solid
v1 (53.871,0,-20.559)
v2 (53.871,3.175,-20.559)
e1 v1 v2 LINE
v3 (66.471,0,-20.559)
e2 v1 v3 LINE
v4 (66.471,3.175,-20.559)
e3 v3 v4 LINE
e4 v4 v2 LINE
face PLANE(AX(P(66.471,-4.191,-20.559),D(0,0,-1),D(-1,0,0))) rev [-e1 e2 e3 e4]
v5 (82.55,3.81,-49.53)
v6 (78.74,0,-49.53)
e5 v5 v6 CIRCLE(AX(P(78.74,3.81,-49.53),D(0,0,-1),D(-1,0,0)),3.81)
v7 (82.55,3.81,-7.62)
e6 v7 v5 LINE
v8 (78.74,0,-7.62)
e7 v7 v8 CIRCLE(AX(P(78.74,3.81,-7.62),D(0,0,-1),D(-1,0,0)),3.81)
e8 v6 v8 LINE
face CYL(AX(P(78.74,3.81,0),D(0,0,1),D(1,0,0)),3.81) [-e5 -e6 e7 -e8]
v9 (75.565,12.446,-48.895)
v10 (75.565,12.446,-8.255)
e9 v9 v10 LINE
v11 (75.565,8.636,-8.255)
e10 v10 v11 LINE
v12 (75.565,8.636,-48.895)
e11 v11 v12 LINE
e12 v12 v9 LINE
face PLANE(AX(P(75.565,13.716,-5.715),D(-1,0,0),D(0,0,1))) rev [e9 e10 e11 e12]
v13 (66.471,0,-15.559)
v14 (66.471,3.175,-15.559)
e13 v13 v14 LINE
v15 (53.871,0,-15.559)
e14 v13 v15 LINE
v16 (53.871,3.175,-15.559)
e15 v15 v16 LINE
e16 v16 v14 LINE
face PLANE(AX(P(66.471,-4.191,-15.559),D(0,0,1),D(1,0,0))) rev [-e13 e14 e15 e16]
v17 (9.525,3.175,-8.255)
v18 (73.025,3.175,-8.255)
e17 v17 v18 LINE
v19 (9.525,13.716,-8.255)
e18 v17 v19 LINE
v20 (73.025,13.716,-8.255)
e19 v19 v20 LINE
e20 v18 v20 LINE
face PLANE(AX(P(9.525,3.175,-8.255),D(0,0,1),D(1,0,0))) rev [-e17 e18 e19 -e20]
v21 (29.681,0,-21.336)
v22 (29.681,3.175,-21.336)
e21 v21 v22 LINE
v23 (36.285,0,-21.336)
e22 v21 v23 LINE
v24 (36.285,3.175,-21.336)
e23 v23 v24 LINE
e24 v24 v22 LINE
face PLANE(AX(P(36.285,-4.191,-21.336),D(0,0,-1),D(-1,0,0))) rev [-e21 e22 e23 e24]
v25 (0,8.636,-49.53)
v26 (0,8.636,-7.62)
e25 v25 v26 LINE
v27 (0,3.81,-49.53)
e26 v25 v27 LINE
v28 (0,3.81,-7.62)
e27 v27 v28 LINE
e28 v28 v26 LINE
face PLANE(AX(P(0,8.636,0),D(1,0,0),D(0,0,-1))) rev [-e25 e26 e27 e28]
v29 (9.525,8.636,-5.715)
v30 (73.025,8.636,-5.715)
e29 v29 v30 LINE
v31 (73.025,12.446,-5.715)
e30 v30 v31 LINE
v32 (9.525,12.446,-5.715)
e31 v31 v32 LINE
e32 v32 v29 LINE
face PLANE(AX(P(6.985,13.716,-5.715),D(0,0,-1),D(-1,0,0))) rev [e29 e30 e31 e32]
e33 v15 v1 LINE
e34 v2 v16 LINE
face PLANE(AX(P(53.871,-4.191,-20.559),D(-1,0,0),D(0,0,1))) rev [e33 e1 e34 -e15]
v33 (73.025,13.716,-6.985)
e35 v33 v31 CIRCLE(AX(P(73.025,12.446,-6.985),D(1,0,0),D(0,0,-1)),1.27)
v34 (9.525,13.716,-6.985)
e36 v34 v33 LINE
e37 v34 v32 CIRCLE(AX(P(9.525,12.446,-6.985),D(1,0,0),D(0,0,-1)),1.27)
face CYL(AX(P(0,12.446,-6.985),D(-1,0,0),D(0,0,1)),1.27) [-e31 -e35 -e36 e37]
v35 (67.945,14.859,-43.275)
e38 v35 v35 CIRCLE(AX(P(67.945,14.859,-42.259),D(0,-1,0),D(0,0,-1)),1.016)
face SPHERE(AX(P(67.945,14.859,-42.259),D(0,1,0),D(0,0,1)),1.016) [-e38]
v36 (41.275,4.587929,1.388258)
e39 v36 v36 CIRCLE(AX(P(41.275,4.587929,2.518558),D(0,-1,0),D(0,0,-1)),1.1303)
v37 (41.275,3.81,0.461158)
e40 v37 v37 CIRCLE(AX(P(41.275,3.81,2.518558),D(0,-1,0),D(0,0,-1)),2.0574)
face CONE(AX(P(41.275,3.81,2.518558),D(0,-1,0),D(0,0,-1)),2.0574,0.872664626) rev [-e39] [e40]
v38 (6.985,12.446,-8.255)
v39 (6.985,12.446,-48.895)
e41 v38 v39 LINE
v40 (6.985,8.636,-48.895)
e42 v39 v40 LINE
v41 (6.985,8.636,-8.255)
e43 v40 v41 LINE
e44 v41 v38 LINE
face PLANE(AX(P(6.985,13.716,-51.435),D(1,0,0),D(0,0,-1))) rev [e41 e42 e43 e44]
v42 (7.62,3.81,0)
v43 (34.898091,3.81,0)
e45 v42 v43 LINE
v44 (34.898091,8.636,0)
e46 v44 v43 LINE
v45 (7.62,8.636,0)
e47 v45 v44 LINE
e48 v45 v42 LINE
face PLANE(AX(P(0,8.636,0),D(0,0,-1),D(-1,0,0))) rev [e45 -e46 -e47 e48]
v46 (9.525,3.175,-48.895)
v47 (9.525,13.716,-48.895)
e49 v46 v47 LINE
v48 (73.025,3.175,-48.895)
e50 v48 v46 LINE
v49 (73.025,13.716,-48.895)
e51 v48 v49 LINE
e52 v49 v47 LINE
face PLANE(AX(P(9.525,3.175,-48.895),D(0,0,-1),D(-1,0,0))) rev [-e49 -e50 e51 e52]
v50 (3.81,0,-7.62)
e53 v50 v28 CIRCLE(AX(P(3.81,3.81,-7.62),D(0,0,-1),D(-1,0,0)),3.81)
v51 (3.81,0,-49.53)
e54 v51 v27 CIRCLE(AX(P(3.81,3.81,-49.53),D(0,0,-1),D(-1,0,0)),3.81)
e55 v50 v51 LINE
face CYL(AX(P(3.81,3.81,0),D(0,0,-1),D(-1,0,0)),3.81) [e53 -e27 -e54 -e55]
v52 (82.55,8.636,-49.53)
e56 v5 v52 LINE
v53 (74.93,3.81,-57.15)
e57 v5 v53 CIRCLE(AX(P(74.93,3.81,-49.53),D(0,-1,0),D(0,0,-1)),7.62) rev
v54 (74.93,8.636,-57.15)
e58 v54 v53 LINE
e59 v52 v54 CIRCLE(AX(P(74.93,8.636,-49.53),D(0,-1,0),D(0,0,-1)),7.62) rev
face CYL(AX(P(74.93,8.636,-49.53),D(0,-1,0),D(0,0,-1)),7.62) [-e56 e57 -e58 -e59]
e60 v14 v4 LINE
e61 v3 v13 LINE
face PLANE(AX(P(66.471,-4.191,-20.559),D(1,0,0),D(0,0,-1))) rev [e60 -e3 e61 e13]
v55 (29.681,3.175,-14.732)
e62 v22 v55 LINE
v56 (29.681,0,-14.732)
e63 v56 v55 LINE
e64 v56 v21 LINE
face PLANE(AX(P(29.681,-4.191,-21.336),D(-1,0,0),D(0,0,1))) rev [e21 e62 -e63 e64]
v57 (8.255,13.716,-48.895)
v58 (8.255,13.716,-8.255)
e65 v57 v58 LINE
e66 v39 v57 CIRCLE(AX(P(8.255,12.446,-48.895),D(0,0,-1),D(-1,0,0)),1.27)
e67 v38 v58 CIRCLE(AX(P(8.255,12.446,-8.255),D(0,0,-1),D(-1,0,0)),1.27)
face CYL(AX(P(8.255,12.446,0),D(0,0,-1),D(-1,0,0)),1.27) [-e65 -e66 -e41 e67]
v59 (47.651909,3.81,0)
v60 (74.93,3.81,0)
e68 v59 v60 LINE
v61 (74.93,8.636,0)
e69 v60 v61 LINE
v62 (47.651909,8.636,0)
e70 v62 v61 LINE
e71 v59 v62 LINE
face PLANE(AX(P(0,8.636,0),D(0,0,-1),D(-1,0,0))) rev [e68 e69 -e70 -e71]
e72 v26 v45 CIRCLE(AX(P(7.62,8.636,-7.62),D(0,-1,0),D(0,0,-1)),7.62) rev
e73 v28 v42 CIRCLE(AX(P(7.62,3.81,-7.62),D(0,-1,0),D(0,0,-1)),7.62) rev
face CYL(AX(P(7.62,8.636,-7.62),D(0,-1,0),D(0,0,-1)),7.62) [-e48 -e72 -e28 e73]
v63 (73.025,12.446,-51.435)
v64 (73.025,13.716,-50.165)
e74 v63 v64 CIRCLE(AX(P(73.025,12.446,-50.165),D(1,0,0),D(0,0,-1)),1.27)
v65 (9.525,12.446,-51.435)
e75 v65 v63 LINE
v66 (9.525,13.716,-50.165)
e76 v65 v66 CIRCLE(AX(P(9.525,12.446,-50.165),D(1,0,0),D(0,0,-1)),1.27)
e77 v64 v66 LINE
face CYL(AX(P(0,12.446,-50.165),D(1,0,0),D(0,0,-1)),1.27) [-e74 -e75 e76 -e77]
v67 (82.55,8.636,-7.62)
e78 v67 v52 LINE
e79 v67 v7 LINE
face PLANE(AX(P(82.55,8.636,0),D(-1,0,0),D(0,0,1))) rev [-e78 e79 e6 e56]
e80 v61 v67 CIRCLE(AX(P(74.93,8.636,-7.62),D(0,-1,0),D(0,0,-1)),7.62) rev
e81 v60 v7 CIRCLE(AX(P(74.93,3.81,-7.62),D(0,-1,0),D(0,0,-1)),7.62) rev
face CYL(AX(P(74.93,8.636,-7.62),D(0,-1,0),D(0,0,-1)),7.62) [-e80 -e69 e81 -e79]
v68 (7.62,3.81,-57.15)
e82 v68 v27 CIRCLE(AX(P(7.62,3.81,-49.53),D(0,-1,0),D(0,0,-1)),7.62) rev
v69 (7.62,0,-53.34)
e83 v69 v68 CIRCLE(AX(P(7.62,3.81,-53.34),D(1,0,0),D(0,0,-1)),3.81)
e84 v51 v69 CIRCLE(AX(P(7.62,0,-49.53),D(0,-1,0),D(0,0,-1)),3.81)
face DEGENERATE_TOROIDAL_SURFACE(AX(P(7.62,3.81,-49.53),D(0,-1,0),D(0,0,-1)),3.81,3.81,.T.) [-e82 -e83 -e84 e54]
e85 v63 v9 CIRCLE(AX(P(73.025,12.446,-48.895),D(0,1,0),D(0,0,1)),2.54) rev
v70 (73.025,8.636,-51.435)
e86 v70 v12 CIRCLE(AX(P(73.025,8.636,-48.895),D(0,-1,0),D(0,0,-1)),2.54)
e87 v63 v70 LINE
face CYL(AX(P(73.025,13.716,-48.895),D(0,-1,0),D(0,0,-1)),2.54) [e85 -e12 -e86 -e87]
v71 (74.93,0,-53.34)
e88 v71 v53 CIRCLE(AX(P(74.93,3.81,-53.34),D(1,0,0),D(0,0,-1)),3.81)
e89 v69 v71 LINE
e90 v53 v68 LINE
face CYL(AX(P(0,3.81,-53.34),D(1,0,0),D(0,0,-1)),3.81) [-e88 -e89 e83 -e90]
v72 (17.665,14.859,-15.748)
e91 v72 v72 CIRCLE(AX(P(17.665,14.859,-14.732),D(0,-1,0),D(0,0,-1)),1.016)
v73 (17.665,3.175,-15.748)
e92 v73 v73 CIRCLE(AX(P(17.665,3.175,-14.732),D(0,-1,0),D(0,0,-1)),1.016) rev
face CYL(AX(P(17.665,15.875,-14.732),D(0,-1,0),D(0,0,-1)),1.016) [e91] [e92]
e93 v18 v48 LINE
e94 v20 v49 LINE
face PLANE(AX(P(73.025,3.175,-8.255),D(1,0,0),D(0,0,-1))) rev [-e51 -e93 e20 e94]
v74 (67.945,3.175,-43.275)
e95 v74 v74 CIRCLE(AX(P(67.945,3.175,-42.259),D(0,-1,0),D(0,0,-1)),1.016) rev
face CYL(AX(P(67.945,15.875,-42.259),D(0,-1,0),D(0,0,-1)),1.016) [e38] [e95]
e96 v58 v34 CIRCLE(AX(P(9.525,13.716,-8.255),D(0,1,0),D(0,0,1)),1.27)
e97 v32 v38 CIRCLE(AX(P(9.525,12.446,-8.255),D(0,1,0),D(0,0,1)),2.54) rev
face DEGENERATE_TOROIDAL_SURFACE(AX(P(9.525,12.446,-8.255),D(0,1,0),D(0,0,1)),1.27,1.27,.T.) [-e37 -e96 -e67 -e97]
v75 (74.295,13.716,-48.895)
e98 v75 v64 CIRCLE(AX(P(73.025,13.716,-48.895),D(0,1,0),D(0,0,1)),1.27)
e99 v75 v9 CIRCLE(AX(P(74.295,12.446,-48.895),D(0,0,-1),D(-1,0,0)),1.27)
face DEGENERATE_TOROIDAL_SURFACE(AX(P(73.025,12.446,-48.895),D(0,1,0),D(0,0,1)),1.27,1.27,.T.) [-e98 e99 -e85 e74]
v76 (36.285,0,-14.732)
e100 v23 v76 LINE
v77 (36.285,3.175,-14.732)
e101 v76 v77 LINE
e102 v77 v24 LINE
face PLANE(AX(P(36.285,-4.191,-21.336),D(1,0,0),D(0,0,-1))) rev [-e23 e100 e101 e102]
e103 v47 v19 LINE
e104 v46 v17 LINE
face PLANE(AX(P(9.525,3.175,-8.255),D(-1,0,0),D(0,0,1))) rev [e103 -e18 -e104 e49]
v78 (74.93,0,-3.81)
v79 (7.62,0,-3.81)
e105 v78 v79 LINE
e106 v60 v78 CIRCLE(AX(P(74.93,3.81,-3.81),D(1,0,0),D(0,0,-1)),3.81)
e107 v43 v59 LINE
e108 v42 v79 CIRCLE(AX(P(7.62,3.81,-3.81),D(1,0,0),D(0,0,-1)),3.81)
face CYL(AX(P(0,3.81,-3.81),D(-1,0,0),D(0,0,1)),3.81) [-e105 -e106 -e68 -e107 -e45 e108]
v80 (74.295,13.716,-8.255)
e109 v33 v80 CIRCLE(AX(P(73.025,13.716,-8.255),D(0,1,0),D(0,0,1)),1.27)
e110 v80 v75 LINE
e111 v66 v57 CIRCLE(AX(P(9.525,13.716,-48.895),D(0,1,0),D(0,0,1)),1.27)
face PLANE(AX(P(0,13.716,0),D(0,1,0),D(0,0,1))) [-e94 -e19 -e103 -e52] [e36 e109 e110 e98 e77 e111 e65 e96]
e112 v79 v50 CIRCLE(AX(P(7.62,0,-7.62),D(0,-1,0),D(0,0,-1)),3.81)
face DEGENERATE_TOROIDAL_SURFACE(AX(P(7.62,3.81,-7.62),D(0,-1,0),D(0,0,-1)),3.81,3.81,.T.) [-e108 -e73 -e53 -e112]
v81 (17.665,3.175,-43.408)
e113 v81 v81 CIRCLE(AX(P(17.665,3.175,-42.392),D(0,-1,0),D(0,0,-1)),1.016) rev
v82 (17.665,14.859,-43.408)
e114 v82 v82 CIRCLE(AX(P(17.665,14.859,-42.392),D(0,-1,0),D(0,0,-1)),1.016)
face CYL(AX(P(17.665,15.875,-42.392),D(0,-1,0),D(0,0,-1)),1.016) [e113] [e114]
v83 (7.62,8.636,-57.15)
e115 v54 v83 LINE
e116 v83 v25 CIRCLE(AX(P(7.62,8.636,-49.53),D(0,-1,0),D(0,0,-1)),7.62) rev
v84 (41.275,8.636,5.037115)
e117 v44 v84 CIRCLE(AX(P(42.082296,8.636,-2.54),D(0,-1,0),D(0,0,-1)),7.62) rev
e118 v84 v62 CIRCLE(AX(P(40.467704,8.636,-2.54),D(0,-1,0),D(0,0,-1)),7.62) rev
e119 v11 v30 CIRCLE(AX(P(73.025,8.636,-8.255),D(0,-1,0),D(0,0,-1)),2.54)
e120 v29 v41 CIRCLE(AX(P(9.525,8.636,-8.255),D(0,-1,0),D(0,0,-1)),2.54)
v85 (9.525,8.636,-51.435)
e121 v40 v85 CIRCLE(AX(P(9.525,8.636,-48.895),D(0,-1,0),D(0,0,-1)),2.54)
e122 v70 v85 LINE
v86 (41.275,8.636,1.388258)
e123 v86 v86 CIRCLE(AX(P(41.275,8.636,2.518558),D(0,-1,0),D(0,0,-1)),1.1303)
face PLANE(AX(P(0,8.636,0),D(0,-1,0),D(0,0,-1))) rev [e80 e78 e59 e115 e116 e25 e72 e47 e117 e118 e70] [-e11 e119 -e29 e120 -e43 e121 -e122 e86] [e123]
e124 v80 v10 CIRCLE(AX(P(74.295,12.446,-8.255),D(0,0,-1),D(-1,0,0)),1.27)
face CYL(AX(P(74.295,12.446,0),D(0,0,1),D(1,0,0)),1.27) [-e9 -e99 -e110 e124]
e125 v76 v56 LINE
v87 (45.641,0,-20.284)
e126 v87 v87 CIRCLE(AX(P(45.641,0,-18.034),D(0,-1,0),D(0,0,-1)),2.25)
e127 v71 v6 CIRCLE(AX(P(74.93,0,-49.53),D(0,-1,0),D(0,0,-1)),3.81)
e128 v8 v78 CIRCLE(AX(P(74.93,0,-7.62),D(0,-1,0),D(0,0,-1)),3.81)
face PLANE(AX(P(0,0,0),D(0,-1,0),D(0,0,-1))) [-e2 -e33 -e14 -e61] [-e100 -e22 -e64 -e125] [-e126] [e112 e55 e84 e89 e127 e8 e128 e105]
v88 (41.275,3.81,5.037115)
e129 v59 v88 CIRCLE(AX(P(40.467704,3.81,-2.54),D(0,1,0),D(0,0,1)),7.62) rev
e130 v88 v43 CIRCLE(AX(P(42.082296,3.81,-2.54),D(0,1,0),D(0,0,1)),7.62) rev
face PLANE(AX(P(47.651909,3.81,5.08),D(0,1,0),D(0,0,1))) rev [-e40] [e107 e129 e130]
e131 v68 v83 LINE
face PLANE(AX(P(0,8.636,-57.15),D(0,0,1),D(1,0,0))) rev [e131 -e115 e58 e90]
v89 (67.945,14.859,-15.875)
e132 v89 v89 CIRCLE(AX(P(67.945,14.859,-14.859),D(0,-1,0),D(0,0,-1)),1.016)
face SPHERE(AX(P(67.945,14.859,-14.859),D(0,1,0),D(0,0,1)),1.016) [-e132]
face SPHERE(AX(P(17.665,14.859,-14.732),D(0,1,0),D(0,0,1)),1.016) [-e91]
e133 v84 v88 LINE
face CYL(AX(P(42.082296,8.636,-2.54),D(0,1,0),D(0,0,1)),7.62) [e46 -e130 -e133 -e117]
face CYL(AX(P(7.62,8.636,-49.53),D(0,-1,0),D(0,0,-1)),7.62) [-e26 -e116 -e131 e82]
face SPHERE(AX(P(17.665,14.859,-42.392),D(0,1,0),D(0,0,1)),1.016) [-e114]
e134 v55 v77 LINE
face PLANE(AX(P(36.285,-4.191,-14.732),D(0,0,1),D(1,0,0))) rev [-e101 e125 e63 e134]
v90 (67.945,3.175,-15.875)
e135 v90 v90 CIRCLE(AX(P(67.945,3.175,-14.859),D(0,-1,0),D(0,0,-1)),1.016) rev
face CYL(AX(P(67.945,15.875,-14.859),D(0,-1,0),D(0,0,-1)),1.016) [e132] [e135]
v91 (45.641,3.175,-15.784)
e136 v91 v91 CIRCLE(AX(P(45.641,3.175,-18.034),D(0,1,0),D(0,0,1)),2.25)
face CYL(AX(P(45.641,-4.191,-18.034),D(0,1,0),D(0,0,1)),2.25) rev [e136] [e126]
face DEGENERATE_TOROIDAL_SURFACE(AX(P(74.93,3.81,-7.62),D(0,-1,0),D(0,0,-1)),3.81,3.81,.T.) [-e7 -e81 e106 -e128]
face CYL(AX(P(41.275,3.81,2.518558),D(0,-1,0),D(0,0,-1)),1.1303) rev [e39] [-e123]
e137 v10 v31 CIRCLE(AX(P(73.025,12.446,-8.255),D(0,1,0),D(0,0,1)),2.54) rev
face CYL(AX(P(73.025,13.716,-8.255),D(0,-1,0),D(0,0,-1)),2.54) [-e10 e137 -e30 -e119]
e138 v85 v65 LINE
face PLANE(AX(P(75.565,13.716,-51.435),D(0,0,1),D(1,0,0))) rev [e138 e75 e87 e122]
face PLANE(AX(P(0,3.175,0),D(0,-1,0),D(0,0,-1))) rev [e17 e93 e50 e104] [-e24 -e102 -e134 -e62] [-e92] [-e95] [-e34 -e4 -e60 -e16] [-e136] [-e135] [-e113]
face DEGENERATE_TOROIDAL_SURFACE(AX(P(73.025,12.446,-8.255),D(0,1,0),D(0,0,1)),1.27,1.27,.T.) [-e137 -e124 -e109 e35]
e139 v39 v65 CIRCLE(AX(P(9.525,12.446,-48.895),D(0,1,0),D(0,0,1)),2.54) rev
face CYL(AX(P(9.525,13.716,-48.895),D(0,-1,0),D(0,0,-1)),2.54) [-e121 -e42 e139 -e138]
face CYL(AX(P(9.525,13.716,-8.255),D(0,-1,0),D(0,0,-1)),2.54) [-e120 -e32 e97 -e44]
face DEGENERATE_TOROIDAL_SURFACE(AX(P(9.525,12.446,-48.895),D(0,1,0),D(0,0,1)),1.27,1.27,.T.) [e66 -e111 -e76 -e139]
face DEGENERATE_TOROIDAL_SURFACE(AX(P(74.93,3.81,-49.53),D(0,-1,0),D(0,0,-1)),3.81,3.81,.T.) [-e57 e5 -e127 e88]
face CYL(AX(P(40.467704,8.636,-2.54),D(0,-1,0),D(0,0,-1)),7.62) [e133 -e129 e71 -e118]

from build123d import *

# Parameters (mm, degrees)
SKETCH1_W                       = 82.55
SKETCH1_H                       = 57.15
BOSS_EXTRUDE1_DEPTH             = 8.636
FILLET2_R                       = 7.62
FILLET3_R                       = 3.81
SKETCH2_W                       = 63.5
SKETCH2_H                       = 40.64
CUT_EXTRUDE1_DEPTH              = 5.461
SKETCH7_W                       = 68.58
SKETCH7_H                       = 45.72
BOSS_EXTRUDE3_DEPTH             = 5.08
SKETCH8_W                       = 63.5
SKETCH8_H                       = 40.64
CUT_EXTRUDE3_DEPTH              = 5.08
SKETCH5_R                       = 1.016
BOSS_EXTRUDE4_DEPTH             = 12.7
SKETCH4_R                       = 2.25
SKETCH4_W                       = 12.6
SKETCH4_H                       = 5
SKETCH4_W_2                     = 6.604
SKETCH4_H_2                     = 6.604
CUT_EXTRUDE2_DEPTH              = 7.366
FILLET7_R                       = 1.016
FILLET8_R                       = 2.54
SKETCH9_W                       = 12.753817634
SKETCH9_H                       = 4.826
BOSS_EXTRUDE5_DEPTH             = 5.08
FILLET10_R                      = 7.62
FILLET11_R                      = 1.27
FILLET12_R                      = 1.016
F_4_40_TAPPED_HOLE2_D           = 2.2606
F_4_40_TAPPED_HOLE2_DEPTH       = 7.62
F_4_40_TAPPED_HOLE2_CSINK_D     = 4.1148
F_4_40_TAPPED_HOLE2_CSINK_ANGLE = 100
F_4_40_TAPPED_HOLE2_TIP         = 0.679152758


with BuildPart() as part:
    # Sketch1 → Boss-Extrude1 (new body)
    with BuildSketch(Plane(origin=(0, 0, 0), x_dir=(1, 0, 0), z_dir=(0, 1, 0))):
        with Locations((41.275, 28.575)):
            Rectangle(SKETCH1_W, SKETCH1_H)
    extrude(amount=BOSS_EXTRUDE1_DEPTH)

    # Fillet2
    fillet2_edges = [part.edges().sort_by_distance(p)[0] for p in [
        (0, 4.318, -57.15),
        (82.55, 4.318, -57.15),
        (82.55, 4.318, 0),
        (0, 4.318, 0),
    ]]
    fillet(fillet2_edges, radius=FILLET2_R)

    # Fillet3
    fillet3_edges = [part.edges().sort_by_distance(p)[0] for p in [
        (41.275, 0, -57.15),
        (0, 0, -28.575),
        (82.55, 0, -28.575),
        (41.275, 0, 0),
        (2.231846327, 0, -54.918153673),
        (2.231846327, 0, -2.231846327),
        (80.318153673, 0, -2.231846327),
        (80.318153673, 0, -54.918153673),
    ]]
    fillet(fillet3_edges, radius=FILLET3_R)

    # Sketch2 → Cut-Extrude1 (cut)
    with BuildSketch(Plane(origin=(0, 8.636, 0), x_dir=(1, 0, 0), z_dir=(0, 1, 0))):
        with Locations((41.275, 28.575)):
            Rectangle(SKETCH2_W, SKETCH2_H)
    extrude(amount=-CUT_EXTRUDE1_DEPTH, mode=Mode.SUBTRACT)

    # Sketch7 → Boss-Extrude3 (add)
    with BuildSketch(Plane(origin=(0, 8.636, 0), x_dir=(1, 0, 0), z_dir=(0, 1, 0))):
        with Locations((41.275, 28.575)):
            Rectangle(SKETCH7_W, SKETCH7_H)
    extrude(amount=BOSS_EXTRUDE3_DEPTH)

    # Sketch8 → Cut-Extrude3 (cut)
    with BuildSketch(Plane(origin=(0, 13.716, 0), x_dir=(1, 0, 0), z_dir=(0, 1, 0))):
        with Locations((41.275, 28.575)):
            Rectangle(SKETCH8_W, SKETCH8_H)
    extrude(amount=-CUT_EXTRUDE3_DEPTH, mode=Mode.SUBTRACT)

    # Sketch5 → Boss-Extrude4 (add)
    with BuildSketch(Plane(origin=(0, 3.175, 0), x_dir=(1, 0, 0), z_dir=(0, 1, 0))):
        with Locations(Location((17.665, 42.392, 0), (0, 0, 90))):
            Circle(SKETCH5_R)
        with Locations(Location((17.665, 14.732, 0), (0, 0, 90))):
            Circle(SKETCH5_R)
        with Locations(Location((67.945, 42.259, 0), (0, 0, 90))):
            Circle(SKETCH5_R)
        with Locations(Location((67.945, 14.859, 0), (0, 0, 90))):
            Circle(SKETCH5_R)
    extrude(amount=BOSS_EXTRUDE4_DEPTH)

    # Sketch4 → Cut-Extrude2 (cut)
    with BuildSketch(Plane(origin=(0, 3.175, 0), x_dir=(1, 0, 0), z_dir=(0, 1, 0))):
        with Locations(Location((45.641, 18.034, 0), (0, 0, 270))):
            Circle(SKETCH4_R)
        with Locations((60.171, 18.059)):
            Rectangle(SKETCH4_W, SKETCH4_H)
        with Locations((32.983, 18.034)):
            Rectangle(SKETCH4_W_2, SKETCH4_H_2)
    extrude(amount=-CUT_EXTRUDE2_DEPTH, mode=Mode.SUBTRACT)

    # Fillet7
    fillet7_edges = [part.edges().sort_by_distance(p)[0] for p in [
        (17.665, 15.875, -41.376),
        (17.665, 15.875, -13.716),
        (67.945, 15.875, -41.243),
    ]]
    fillet(fillet7_edges, radius=FILLET7_R)

    # Fillet8
    fillet8_edges = [part.edges().sort_by_distance(p)[0] for p in [
        (75.565, 11.176, -51.435),
        (6.985, 11.176, -51.435),
        (6.985, 11.176, -5.715),
        (75.565, 11.176, -5.715),
    ]]
    fillet(fillet8_edges, radius=FILLET8_R)

    # Sketch9 → Boss-Extrude5 (add)
    with BuildSketch(Plane.XY):
        with Locations((41.275, 6.223)):
            Rectangle(SKETCH9_W, SKETCH9_H)
    extrude(amount=BOSS_EXTRUDE5_DEPTH)

    # Fillet10
    # the kernel refuses this fillet: 7.62 mm, written as the material it takes off along each edge
    with BuildSketch(Plane(origin=(47.651908817, -14.150512242, 5.08), x_dir=(0, 0, -1), z_dir=(0, 1, 0)), Plane(origin=(34.898091183, 26.596512242, 5.08), x_dir=(0, 0, -1), z_dir=(0, -1, 0))) as fillet10_piece_1:
        with BuildLine():
            CenterArc((7.62, 7.184204897), FILLET10_R, 180, 70.528779366)
            Line((0, 7.184204897), (-0.1524, 7.184204897))
            Line((-0.1524, 7.184204897), (-0.1524, 0))
            Line((-0.1524, 0), (0, -0.1524))
            ThreePointArc((0, -0.1524), (2.54, -0.1524), (5.0292, -0.143684098))
            Line((5.0292, -0.143684098), (5.08, 0))
        make_face()
    extrude(amount=40.747024484, mode=Mode.SUBTRACT)

    # Fillet11
    fillet11_edges = [part.edges().sort_by_distance(p)[0] for p in [
        (41.275, 13.716, -51.435),
        (75.565, 13.716, -28.575),
        (6.985, 13.716, -28.575),
        (41.275, 13.716, -5.715),
        (7.728948776, 13.716, -50.691051224),
        (7.728948776, 13.716, -6.458948776),
        (74.821051224, 13.716, -6.458948776),
        (74.821051224, 13.716, -50.691051224),
    ]]
    fillet(fillet11_edges, radius=FILLET11_R)

    # Fillet12
    fillet12_edges = [part.edges().sort_by_distance(p)[0] for p in [
        (67.945, 15.875, -13.843),
    ]]
    fillet(fillet12_edges, radius=FILLET12_R)

    # #4-40 Tapped Hole2
    with Locations(Plane(origin=(0, 3.81, 0), x_dir=(-1, 0, 0), z_dir=(0, -1, 0))):
        with Locations((-41.275, -2.518557543)):
            CounterSinkHole(F_4_40_TAPPED_HOLE2_D / 2, F_4_40_TAPPED_HOLE2_CSINK_D / 2, depth=F_4_40_TAPPED_HOLE2_DEPTH, counter_sink_angle=F_4_40_TAPPED_HOLE2_CSINK_ANGLE)
            with Locations((0, 0, -(F_4_40_TAPPED_HOLE2_DEPTH + F_4_40_TAPPED_HOLE2_TIP / 2))):  # 118° drill point
                Cone(0, F_4_40_TAPPED_HOLE2_D / 2, F_4_40_TAPPED_HOLE2_TIP, mode=Mode.SUBTRACT)


solid = part.part
